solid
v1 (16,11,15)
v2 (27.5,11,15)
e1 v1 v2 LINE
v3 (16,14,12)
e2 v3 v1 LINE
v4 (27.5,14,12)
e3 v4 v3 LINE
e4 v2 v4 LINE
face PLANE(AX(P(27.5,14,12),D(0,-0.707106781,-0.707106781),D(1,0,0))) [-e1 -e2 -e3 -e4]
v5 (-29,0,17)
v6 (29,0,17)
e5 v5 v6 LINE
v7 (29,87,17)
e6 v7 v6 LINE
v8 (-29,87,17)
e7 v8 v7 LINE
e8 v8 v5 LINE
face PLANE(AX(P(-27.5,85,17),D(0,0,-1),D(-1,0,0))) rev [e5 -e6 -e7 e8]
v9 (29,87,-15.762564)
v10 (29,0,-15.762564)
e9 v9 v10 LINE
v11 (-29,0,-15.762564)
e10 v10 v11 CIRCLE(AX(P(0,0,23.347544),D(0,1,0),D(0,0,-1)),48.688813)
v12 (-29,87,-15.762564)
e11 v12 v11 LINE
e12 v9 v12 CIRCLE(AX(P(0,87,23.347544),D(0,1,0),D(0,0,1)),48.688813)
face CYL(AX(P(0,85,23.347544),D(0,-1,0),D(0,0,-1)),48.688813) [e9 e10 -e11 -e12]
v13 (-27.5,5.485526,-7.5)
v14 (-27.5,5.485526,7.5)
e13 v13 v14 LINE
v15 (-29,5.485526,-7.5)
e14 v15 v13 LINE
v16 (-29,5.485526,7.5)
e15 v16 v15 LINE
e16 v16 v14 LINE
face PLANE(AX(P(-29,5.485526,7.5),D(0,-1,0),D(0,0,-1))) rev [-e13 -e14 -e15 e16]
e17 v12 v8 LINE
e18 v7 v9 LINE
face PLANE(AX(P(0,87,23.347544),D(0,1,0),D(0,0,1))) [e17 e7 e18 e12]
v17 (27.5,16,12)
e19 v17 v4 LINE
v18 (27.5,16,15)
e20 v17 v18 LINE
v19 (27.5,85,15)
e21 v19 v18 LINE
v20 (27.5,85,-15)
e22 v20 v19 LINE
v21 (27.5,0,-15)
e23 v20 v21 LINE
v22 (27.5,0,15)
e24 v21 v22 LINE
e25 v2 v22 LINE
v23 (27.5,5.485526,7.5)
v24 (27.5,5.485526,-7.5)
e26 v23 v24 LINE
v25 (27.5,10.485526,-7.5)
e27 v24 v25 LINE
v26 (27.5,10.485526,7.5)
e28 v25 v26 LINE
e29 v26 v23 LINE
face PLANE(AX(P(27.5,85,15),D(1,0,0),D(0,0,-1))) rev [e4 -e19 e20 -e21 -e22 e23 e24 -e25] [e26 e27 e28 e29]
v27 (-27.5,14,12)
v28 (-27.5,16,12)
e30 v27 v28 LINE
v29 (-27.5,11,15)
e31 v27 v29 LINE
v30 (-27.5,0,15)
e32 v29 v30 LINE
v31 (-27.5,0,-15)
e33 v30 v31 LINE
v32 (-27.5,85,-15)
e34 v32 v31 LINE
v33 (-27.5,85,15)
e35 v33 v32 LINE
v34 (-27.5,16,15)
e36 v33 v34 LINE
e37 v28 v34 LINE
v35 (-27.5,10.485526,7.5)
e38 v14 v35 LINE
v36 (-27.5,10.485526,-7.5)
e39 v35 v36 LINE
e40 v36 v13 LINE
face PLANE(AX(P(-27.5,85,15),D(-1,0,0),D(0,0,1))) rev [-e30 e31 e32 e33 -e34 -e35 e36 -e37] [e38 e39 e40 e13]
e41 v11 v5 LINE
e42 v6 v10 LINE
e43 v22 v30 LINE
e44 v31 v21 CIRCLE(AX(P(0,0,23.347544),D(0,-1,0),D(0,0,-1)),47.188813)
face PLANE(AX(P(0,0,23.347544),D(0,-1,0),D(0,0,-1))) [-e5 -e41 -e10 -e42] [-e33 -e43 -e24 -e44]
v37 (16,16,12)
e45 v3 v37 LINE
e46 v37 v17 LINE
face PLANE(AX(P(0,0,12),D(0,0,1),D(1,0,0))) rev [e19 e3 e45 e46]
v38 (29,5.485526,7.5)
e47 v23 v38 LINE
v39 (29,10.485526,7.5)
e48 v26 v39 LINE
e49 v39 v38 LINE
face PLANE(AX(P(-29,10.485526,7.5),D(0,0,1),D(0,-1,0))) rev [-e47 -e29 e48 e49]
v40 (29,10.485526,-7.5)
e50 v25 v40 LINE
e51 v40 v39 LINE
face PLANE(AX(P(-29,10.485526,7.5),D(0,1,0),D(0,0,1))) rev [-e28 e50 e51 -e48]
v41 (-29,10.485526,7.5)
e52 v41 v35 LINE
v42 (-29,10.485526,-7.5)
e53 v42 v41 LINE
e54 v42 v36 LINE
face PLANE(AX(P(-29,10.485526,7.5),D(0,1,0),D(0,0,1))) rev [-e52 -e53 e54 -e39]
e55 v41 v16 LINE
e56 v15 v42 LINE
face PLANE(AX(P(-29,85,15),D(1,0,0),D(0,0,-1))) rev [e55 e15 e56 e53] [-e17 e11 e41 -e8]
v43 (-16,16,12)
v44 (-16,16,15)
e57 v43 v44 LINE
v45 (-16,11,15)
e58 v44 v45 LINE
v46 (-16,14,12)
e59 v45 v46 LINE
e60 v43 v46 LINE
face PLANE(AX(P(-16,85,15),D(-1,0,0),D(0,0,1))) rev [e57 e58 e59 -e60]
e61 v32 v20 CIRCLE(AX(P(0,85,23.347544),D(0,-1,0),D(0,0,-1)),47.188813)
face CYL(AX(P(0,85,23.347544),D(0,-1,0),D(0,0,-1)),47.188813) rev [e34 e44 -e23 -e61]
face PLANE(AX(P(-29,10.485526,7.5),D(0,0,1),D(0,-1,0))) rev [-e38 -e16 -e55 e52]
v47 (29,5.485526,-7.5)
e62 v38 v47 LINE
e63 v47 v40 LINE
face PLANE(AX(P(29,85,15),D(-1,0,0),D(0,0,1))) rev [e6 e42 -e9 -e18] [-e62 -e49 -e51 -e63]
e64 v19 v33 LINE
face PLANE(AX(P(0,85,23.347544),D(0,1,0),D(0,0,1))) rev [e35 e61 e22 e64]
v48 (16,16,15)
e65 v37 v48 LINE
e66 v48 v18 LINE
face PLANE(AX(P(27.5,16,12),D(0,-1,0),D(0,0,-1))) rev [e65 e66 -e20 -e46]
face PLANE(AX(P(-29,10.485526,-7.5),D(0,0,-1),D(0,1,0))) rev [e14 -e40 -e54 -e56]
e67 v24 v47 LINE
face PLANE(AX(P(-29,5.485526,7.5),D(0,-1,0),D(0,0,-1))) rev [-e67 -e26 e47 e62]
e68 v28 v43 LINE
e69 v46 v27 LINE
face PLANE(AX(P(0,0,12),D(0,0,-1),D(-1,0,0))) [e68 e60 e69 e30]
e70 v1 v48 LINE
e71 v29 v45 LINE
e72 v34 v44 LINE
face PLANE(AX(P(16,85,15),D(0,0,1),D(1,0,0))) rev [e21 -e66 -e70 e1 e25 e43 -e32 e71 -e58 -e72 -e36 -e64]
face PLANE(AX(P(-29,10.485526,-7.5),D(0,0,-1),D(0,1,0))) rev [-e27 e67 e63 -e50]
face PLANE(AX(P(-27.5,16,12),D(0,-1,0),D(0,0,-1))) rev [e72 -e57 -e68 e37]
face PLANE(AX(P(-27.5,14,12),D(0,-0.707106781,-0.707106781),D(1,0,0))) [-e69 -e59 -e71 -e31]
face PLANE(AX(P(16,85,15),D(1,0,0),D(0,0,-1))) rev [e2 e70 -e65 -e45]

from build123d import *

# Parameters (mm, degrees)
BOSS_EXTRUDE1_DEPTH = 85
BOSS_EXTRUDE3_DEPTH = 2
SKETCH9_W           = 11.5
SKETCH9_H           = 2
BOSS_EXTRUDE8_DEPTH = 3
CHAMFER1_SIZE       = 3
SKETCH10_W          = 32
SKETCH10_H          = 85
BOSS_EXTRUDE9_DEPTH = 2
SKETCH11_W          = 15
SKETCH11_H          = 5
CUT_EXTRUDE1_DEPTH  = 108.588010242


with BuildPart() as part:
    # Sketch1 → Boss-Extrude1 (new body)
    with BuildSketch(Plane(origin=(0, 0, 0), x_dir=(1, 0, 0), z_dir=(0, 1, 0))):
        with BuildLine():
            Line((-29, -15), (-29, 15.762564303))
            ThreePointArc((-29, 15.762564303), (0, 25.341269657), (29, 15.762564303))
            Line((29, 15.762564303), (29, -15))
            Line((29, -15), (29, -17))
            Line((29, -17), (27.5, -17))
            Line((27.5, -17), (16, -17))
            Line((16, -17), (16, -15))
            Line((16, -15), (27.5, -15))
            Line((27.5, -15), (27.5, 15))
            ThreePointArc((27.5, 15), (0, 23.841269657), (-27.5, 15))
            Line((-27.5, 15), (-27.5, -15))
            Line((-27.5, -15), (-16, -15))
            Line((-16, -15), (-16, -17))
            Line((-16, -17), (-27.5, -17))
            Line((-27.5, -17), (-29, -17))
            Line((-29, -17), (-29, -15))
        make_face()
    extrude(amount=BOSS_EXTRUDE1_DEPTH)

    # Sketch3 → Boss-Extrude3 (add)
    with BuildSketch(Plane(origin=(0, 85, 0), x_dir=(1, 0, 0), z_dir=(0, 1, 0))):
        with BuildLine():
            Line((-16, -17), (16, -17))
            Line((16, -17), (29, -17))
            Line((29, -17), (29, 15.762564303))
            ThreePointArc((29, 15.762564303), (0, 25.341269657), (-29, 15.762564303))
            Line((-29, 15.762564303), (-29, -17))
            Line((-29, -17), (-16, -17))
        make_face()
    extrude(amount=BOSS_EXTRUDE3_DEPTH)

    # Sketch9 → Boss-Extrude8 (add)
    with BuildSketch(Plane(origin=(0, 0, 15), x_dir=(-1, 0, 0), z_dir=(0, 0, -1))):
        with Locations((-21.75, 15)):
            Rectangle(SKETCH9_W, SKETCH9_H)
        with Locations((21.75, 15)):
            Rectangle(SKETCH9_W, SKETCH9_H)
    extrude(amount=BOSS_EXTRUDE8_DEPTH)

    # Chamfer1
    chamfer1_edges = [part.edges().sort_by_distance(p)[0] for p in [
        (-21.75, 14, 15),
        (21.75, 14, 15),
    ]]
    chamfer(chamfer1_edges, length=CHAMFER1_SIZE - 0.0001)  # a hair under: the kernel refuses the full size

    # Sketch10 → Boss-Extrude9 (add)
    with BuildSketch(Plane.XY.offset(17)):
        with Locations((0, 42.5)):
            Rectangle(SKETCH10_W, SKETCH10_H)
    extrude(amount=-BOSS_EXTRUDE9_DEPTH)

    # Sketch11 → Cut-Extrude1 (cut, through all)
    with BuildSketch(Plane(origin=(29, 0, 0), x_dir=(0, 0, -1), z_dir=(1, 0, 0))):
        with Locations((0, 7.985525628)):
            Rectangle(SKETCH11_W, SKETCH11_H)
    extrude(amount=-CUT_EXTRUDE1_DEPTH, mode=Mode.SUBTRACT)


solid = part.part
